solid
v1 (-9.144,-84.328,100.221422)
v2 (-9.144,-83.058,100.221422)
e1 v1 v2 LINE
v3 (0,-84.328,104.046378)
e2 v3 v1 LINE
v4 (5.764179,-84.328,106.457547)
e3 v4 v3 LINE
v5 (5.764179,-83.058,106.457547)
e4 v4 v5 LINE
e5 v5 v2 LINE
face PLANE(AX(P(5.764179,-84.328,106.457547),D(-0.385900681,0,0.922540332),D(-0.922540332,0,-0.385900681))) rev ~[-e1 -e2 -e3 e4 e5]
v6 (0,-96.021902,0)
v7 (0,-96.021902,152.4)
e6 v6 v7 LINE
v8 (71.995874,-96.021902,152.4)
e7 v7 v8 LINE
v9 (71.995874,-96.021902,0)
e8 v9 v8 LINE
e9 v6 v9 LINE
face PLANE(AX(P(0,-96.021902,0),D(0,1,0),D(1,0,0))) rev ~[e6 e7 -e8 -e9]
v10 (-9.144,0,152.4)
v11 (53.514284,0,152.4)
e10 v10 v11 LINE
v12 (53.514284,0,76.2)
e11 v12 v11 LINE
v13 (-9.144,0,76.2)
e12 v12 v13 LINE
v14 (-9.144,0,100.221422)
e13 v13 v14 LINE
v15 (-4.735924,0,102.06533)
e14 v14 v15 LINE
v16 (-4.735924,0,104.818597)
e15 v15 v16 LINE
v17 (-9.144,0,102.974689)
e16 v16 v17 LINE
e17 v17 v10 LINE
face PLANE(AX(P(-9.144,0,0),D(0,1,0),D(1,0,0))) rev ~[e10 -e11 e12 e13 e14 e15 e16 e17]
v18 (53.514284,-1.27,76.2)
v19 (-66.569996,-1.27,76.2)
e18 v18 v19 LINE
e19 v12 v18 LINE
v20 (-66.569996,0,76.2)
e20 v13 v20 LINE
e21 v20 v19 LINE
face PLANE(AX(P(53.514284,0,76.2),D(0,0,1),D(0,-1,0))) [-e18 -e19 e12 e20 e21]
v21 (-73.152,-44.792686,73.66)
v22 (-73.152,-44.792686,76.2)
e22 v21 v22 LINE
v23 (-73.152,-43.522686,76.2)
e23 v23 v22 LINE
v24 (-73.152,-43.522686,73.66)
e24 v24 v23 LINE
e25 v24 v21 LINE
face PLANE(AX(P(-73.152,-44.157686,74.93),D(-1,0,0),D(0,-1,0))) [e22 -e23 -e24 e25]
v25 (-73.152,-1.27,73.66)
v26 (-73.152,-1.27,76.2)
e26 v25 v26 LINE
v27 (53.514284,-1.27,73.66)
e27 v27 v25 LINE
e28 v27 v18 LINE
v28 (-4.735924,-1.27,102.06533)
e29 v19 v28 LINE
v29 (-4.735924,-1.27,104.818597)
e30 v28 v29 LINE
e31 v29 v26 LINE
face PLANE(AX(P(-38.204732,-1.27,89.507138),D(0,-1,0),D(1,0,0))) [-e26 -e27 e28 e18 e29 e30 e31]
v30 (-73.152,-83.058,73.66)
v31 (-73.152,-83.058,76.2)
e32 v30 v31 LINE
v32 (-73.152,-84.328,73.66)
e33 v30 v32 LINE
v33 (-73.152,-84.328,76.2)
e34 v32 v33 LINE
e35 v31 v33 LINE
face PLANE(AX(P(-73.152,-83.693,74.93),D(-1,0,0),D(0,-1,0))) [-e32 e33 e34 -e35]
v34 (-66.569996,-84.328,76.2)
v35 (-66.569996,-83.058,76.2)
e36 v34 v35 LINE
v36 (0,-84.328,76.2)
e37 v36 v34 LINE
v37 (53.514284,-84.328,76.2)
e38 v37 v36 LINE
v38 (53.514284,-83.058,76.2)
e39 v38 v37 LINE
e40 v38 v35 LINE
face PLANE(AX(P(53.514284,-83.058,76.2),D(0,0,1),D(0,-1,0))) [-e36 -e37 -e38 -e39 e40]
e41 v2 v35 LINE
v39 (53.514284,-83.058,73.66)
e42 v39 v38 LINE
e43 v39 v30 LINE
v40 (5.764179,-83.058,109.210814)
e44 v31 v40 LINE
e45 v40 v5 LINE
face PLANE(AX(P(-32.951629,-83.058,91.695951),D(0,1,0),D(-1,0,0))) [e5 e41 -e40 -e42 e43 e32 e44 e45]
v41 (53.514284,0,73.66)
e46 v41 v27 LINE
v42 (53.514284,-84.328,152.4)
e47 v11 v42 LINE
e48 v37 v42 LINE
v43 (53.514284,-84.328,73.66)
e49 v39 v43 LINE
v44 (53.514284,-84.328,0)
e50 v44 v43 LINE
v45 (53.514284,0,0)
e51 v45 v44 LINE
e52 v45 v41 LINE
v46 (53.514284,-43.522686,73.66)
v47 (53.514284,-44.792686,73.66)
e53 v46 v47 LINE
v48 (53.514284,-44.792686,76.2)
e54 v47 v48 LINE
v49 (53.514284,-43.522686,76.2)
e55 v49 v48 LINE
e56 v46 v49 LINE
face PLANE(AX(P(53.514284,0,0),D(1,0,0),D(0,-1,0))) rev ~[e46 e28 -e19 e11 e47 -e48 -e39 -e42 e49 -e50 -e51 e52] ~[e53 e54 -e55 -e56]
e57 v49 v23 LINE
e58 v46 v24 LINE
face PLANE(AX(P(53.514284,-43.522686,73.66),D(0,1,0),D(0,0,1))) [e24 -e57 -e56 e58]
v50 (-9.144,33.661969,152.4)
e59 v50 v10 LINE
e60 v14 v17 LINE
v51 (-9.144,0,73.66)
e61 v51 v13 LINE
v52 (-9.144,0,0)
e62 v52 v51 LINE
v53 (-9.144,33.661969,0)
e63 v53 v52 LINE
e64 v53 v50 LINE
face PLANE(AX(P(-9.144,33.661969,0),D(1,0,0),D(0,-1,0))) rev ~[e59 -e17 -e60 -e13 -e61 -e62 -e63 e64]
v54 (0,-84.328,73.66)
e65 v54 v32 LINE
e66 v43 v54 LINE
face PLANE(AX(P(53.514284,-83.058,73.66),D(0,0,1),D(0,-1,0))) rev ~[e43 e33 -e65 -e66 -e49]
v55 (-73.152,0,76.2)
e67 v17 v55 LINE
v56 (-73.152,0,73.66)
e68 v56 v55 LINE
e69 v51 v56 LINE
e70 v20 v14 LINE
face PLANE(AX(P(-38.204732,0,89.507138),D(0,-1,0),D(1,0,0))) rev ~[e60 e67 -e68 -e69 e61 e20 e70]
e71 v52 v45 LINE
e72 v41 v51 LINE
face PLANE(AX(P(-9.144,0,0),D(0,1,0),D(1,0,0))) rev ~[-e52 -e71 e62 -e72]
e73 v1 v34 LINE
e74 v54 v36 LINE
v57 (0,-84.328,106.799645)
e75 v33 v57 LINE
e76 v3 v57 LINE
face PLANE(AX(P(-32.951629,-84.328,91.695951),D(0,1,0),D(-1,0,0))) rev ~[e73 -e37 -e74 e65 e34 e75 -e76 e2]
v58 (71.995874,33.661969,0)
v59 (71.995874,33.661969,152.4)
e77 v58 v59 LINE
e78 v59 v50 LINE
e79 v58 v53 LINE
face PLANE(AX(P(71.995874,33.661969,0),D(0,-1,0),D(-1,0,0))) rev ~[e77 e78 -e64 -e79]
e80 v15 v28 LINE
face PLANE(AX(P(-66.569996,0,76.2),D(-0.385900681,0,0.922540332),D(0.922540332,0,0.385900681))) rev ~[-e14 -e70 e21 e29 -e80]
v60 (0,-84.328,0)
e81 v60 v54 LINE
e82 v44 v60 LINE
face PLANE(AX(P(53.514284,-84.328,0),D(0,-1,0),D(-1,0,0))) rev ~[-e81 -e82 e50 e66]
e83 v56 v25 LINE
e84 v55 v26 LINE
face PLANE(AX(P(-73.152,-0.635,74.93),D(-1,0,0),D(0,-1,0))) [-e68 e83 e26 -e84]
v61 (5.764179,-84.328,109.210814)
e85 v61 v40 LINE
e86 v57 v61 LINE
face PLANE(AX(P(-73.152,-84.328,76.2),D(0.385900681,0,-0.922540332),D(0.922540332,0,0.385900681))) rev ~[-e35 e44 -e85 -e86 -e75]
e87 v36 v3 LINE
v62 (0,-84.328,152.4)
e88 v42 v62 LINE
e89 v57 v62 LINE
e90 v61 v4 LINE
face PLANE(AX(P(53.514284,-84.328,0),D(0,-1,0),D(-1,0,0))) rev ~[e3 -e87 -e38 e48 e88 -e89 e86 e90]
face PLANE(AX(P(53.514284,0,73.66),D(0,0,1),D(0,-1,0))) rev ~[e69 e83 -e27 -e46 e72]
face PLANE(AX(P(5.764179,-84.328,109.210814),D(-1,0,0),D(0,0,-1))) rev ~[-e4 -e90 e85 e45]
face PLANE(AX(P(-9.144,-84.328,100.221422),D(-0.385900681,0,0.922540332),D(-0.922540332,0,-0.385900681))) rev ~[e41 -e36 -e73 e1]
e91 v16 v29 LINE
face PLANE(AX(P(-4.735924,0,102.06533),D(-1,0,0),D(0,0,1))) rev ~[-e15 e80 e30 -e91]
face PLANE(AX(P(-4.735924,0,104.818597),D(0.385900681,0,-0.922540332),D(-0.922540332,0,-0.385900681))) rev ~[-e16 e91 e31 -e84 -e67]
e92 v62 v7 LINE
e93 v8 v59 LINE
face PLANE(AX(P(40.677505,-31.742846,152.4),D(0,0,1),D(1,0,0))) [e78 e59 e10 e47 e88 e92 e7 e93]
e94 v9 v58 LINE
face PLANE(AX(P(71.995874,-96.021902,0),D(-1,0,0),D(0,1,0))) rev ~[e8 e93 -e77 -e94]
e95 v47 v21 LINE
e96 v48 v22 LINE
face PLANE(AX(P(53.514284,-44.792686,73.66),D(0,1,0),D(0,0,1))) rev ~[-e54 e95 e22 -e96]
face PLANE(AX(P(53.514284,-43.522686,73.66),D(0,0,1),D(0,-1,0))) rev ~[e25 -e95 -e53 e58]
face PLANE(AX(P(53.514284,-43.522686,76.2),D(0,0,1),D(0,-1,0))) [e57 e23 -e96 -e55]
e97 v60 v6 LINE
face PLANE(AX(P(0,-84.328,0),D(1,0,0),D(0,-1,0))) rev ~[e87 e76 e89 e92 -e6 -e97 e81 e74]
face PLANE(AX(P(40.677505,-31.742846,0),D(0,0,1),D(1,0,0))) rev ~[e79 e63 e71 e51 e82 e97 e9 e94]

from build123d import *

# Parameters (mm, degrees)
F2_DEPTH  = 152.4
F3_W      = 1.27
F3_H      = 2.54
F4_DEPTH  = 126.6662840818
F8_DEPTH  = 1.27
F12_DEPTH = 1.27


# Not quite as in the source:
# - the program builds the solid bodies; features that only make, move or delete a surface that nothing else refers to are left out


with BuildPart() as f2:
    # F1 (on Top) → F2 (new body)
    with BuildSketch(Plane.XY):
        Polygon((-9.144, 0), (53.5142840818, 0), (53.5142840818, -84.328), (0, -84.328), (0, -96.0219023137), (53.5142840818, -96.0219023137), (71.9958739355, -96.0219023137), (71.9958739355, 33.6619690061), (53.5142840818, 33.6619690061), (-9.144, 33.6619690061), align=None)
    extrude(amount=F2_DEPTH)

    # F3 (on face) → F4 (join, through all)
    with BuildSketch(Plane(origin=(53.5142840818, 0, 0), x_dir=(0, -1, 0), z_dir=(-1, 0, 0))):
        with Locations((0.635, 74.93)):
            Rectangle(F3_W, F3_H)
        with Locations((83.693, 74.93)):
            Rectangle(F3_W, F3_H)
        with Locations((44.1576857662, 74.93)):
            Rectangle(F3_W, F3_H)
    extrude(amount=F4_DEPTH)

    # F7 (on face) → F8 (join)
    with BuildSketch(Plane.XZ):
        Polygon((-4.7359238379, 104.818597436), (-73.152, 76.2), (-66.5699955492, 76.2), (-4.7359238379, 102.0653302762), align=None)
    extrude(amount=F8_DEPTH)

    # F11 (on face) → F12 (join)
    with BuildSketch(Plane(origin=(0, -84.328, 0), x_dir=(-1, 0, 0), z_dir=(0, 1, 0))):
        Polygon((-5.7641793689, 106.457546895), (9.144, 100.221422174), (66.5699955492, 76.2), (73.152, 76.2), (9.144, 102.9746893338), (-5.7641793689, 109.2108140547), align=None)
    extrude(amount=F12_DEPTH)


solid = f2.part
